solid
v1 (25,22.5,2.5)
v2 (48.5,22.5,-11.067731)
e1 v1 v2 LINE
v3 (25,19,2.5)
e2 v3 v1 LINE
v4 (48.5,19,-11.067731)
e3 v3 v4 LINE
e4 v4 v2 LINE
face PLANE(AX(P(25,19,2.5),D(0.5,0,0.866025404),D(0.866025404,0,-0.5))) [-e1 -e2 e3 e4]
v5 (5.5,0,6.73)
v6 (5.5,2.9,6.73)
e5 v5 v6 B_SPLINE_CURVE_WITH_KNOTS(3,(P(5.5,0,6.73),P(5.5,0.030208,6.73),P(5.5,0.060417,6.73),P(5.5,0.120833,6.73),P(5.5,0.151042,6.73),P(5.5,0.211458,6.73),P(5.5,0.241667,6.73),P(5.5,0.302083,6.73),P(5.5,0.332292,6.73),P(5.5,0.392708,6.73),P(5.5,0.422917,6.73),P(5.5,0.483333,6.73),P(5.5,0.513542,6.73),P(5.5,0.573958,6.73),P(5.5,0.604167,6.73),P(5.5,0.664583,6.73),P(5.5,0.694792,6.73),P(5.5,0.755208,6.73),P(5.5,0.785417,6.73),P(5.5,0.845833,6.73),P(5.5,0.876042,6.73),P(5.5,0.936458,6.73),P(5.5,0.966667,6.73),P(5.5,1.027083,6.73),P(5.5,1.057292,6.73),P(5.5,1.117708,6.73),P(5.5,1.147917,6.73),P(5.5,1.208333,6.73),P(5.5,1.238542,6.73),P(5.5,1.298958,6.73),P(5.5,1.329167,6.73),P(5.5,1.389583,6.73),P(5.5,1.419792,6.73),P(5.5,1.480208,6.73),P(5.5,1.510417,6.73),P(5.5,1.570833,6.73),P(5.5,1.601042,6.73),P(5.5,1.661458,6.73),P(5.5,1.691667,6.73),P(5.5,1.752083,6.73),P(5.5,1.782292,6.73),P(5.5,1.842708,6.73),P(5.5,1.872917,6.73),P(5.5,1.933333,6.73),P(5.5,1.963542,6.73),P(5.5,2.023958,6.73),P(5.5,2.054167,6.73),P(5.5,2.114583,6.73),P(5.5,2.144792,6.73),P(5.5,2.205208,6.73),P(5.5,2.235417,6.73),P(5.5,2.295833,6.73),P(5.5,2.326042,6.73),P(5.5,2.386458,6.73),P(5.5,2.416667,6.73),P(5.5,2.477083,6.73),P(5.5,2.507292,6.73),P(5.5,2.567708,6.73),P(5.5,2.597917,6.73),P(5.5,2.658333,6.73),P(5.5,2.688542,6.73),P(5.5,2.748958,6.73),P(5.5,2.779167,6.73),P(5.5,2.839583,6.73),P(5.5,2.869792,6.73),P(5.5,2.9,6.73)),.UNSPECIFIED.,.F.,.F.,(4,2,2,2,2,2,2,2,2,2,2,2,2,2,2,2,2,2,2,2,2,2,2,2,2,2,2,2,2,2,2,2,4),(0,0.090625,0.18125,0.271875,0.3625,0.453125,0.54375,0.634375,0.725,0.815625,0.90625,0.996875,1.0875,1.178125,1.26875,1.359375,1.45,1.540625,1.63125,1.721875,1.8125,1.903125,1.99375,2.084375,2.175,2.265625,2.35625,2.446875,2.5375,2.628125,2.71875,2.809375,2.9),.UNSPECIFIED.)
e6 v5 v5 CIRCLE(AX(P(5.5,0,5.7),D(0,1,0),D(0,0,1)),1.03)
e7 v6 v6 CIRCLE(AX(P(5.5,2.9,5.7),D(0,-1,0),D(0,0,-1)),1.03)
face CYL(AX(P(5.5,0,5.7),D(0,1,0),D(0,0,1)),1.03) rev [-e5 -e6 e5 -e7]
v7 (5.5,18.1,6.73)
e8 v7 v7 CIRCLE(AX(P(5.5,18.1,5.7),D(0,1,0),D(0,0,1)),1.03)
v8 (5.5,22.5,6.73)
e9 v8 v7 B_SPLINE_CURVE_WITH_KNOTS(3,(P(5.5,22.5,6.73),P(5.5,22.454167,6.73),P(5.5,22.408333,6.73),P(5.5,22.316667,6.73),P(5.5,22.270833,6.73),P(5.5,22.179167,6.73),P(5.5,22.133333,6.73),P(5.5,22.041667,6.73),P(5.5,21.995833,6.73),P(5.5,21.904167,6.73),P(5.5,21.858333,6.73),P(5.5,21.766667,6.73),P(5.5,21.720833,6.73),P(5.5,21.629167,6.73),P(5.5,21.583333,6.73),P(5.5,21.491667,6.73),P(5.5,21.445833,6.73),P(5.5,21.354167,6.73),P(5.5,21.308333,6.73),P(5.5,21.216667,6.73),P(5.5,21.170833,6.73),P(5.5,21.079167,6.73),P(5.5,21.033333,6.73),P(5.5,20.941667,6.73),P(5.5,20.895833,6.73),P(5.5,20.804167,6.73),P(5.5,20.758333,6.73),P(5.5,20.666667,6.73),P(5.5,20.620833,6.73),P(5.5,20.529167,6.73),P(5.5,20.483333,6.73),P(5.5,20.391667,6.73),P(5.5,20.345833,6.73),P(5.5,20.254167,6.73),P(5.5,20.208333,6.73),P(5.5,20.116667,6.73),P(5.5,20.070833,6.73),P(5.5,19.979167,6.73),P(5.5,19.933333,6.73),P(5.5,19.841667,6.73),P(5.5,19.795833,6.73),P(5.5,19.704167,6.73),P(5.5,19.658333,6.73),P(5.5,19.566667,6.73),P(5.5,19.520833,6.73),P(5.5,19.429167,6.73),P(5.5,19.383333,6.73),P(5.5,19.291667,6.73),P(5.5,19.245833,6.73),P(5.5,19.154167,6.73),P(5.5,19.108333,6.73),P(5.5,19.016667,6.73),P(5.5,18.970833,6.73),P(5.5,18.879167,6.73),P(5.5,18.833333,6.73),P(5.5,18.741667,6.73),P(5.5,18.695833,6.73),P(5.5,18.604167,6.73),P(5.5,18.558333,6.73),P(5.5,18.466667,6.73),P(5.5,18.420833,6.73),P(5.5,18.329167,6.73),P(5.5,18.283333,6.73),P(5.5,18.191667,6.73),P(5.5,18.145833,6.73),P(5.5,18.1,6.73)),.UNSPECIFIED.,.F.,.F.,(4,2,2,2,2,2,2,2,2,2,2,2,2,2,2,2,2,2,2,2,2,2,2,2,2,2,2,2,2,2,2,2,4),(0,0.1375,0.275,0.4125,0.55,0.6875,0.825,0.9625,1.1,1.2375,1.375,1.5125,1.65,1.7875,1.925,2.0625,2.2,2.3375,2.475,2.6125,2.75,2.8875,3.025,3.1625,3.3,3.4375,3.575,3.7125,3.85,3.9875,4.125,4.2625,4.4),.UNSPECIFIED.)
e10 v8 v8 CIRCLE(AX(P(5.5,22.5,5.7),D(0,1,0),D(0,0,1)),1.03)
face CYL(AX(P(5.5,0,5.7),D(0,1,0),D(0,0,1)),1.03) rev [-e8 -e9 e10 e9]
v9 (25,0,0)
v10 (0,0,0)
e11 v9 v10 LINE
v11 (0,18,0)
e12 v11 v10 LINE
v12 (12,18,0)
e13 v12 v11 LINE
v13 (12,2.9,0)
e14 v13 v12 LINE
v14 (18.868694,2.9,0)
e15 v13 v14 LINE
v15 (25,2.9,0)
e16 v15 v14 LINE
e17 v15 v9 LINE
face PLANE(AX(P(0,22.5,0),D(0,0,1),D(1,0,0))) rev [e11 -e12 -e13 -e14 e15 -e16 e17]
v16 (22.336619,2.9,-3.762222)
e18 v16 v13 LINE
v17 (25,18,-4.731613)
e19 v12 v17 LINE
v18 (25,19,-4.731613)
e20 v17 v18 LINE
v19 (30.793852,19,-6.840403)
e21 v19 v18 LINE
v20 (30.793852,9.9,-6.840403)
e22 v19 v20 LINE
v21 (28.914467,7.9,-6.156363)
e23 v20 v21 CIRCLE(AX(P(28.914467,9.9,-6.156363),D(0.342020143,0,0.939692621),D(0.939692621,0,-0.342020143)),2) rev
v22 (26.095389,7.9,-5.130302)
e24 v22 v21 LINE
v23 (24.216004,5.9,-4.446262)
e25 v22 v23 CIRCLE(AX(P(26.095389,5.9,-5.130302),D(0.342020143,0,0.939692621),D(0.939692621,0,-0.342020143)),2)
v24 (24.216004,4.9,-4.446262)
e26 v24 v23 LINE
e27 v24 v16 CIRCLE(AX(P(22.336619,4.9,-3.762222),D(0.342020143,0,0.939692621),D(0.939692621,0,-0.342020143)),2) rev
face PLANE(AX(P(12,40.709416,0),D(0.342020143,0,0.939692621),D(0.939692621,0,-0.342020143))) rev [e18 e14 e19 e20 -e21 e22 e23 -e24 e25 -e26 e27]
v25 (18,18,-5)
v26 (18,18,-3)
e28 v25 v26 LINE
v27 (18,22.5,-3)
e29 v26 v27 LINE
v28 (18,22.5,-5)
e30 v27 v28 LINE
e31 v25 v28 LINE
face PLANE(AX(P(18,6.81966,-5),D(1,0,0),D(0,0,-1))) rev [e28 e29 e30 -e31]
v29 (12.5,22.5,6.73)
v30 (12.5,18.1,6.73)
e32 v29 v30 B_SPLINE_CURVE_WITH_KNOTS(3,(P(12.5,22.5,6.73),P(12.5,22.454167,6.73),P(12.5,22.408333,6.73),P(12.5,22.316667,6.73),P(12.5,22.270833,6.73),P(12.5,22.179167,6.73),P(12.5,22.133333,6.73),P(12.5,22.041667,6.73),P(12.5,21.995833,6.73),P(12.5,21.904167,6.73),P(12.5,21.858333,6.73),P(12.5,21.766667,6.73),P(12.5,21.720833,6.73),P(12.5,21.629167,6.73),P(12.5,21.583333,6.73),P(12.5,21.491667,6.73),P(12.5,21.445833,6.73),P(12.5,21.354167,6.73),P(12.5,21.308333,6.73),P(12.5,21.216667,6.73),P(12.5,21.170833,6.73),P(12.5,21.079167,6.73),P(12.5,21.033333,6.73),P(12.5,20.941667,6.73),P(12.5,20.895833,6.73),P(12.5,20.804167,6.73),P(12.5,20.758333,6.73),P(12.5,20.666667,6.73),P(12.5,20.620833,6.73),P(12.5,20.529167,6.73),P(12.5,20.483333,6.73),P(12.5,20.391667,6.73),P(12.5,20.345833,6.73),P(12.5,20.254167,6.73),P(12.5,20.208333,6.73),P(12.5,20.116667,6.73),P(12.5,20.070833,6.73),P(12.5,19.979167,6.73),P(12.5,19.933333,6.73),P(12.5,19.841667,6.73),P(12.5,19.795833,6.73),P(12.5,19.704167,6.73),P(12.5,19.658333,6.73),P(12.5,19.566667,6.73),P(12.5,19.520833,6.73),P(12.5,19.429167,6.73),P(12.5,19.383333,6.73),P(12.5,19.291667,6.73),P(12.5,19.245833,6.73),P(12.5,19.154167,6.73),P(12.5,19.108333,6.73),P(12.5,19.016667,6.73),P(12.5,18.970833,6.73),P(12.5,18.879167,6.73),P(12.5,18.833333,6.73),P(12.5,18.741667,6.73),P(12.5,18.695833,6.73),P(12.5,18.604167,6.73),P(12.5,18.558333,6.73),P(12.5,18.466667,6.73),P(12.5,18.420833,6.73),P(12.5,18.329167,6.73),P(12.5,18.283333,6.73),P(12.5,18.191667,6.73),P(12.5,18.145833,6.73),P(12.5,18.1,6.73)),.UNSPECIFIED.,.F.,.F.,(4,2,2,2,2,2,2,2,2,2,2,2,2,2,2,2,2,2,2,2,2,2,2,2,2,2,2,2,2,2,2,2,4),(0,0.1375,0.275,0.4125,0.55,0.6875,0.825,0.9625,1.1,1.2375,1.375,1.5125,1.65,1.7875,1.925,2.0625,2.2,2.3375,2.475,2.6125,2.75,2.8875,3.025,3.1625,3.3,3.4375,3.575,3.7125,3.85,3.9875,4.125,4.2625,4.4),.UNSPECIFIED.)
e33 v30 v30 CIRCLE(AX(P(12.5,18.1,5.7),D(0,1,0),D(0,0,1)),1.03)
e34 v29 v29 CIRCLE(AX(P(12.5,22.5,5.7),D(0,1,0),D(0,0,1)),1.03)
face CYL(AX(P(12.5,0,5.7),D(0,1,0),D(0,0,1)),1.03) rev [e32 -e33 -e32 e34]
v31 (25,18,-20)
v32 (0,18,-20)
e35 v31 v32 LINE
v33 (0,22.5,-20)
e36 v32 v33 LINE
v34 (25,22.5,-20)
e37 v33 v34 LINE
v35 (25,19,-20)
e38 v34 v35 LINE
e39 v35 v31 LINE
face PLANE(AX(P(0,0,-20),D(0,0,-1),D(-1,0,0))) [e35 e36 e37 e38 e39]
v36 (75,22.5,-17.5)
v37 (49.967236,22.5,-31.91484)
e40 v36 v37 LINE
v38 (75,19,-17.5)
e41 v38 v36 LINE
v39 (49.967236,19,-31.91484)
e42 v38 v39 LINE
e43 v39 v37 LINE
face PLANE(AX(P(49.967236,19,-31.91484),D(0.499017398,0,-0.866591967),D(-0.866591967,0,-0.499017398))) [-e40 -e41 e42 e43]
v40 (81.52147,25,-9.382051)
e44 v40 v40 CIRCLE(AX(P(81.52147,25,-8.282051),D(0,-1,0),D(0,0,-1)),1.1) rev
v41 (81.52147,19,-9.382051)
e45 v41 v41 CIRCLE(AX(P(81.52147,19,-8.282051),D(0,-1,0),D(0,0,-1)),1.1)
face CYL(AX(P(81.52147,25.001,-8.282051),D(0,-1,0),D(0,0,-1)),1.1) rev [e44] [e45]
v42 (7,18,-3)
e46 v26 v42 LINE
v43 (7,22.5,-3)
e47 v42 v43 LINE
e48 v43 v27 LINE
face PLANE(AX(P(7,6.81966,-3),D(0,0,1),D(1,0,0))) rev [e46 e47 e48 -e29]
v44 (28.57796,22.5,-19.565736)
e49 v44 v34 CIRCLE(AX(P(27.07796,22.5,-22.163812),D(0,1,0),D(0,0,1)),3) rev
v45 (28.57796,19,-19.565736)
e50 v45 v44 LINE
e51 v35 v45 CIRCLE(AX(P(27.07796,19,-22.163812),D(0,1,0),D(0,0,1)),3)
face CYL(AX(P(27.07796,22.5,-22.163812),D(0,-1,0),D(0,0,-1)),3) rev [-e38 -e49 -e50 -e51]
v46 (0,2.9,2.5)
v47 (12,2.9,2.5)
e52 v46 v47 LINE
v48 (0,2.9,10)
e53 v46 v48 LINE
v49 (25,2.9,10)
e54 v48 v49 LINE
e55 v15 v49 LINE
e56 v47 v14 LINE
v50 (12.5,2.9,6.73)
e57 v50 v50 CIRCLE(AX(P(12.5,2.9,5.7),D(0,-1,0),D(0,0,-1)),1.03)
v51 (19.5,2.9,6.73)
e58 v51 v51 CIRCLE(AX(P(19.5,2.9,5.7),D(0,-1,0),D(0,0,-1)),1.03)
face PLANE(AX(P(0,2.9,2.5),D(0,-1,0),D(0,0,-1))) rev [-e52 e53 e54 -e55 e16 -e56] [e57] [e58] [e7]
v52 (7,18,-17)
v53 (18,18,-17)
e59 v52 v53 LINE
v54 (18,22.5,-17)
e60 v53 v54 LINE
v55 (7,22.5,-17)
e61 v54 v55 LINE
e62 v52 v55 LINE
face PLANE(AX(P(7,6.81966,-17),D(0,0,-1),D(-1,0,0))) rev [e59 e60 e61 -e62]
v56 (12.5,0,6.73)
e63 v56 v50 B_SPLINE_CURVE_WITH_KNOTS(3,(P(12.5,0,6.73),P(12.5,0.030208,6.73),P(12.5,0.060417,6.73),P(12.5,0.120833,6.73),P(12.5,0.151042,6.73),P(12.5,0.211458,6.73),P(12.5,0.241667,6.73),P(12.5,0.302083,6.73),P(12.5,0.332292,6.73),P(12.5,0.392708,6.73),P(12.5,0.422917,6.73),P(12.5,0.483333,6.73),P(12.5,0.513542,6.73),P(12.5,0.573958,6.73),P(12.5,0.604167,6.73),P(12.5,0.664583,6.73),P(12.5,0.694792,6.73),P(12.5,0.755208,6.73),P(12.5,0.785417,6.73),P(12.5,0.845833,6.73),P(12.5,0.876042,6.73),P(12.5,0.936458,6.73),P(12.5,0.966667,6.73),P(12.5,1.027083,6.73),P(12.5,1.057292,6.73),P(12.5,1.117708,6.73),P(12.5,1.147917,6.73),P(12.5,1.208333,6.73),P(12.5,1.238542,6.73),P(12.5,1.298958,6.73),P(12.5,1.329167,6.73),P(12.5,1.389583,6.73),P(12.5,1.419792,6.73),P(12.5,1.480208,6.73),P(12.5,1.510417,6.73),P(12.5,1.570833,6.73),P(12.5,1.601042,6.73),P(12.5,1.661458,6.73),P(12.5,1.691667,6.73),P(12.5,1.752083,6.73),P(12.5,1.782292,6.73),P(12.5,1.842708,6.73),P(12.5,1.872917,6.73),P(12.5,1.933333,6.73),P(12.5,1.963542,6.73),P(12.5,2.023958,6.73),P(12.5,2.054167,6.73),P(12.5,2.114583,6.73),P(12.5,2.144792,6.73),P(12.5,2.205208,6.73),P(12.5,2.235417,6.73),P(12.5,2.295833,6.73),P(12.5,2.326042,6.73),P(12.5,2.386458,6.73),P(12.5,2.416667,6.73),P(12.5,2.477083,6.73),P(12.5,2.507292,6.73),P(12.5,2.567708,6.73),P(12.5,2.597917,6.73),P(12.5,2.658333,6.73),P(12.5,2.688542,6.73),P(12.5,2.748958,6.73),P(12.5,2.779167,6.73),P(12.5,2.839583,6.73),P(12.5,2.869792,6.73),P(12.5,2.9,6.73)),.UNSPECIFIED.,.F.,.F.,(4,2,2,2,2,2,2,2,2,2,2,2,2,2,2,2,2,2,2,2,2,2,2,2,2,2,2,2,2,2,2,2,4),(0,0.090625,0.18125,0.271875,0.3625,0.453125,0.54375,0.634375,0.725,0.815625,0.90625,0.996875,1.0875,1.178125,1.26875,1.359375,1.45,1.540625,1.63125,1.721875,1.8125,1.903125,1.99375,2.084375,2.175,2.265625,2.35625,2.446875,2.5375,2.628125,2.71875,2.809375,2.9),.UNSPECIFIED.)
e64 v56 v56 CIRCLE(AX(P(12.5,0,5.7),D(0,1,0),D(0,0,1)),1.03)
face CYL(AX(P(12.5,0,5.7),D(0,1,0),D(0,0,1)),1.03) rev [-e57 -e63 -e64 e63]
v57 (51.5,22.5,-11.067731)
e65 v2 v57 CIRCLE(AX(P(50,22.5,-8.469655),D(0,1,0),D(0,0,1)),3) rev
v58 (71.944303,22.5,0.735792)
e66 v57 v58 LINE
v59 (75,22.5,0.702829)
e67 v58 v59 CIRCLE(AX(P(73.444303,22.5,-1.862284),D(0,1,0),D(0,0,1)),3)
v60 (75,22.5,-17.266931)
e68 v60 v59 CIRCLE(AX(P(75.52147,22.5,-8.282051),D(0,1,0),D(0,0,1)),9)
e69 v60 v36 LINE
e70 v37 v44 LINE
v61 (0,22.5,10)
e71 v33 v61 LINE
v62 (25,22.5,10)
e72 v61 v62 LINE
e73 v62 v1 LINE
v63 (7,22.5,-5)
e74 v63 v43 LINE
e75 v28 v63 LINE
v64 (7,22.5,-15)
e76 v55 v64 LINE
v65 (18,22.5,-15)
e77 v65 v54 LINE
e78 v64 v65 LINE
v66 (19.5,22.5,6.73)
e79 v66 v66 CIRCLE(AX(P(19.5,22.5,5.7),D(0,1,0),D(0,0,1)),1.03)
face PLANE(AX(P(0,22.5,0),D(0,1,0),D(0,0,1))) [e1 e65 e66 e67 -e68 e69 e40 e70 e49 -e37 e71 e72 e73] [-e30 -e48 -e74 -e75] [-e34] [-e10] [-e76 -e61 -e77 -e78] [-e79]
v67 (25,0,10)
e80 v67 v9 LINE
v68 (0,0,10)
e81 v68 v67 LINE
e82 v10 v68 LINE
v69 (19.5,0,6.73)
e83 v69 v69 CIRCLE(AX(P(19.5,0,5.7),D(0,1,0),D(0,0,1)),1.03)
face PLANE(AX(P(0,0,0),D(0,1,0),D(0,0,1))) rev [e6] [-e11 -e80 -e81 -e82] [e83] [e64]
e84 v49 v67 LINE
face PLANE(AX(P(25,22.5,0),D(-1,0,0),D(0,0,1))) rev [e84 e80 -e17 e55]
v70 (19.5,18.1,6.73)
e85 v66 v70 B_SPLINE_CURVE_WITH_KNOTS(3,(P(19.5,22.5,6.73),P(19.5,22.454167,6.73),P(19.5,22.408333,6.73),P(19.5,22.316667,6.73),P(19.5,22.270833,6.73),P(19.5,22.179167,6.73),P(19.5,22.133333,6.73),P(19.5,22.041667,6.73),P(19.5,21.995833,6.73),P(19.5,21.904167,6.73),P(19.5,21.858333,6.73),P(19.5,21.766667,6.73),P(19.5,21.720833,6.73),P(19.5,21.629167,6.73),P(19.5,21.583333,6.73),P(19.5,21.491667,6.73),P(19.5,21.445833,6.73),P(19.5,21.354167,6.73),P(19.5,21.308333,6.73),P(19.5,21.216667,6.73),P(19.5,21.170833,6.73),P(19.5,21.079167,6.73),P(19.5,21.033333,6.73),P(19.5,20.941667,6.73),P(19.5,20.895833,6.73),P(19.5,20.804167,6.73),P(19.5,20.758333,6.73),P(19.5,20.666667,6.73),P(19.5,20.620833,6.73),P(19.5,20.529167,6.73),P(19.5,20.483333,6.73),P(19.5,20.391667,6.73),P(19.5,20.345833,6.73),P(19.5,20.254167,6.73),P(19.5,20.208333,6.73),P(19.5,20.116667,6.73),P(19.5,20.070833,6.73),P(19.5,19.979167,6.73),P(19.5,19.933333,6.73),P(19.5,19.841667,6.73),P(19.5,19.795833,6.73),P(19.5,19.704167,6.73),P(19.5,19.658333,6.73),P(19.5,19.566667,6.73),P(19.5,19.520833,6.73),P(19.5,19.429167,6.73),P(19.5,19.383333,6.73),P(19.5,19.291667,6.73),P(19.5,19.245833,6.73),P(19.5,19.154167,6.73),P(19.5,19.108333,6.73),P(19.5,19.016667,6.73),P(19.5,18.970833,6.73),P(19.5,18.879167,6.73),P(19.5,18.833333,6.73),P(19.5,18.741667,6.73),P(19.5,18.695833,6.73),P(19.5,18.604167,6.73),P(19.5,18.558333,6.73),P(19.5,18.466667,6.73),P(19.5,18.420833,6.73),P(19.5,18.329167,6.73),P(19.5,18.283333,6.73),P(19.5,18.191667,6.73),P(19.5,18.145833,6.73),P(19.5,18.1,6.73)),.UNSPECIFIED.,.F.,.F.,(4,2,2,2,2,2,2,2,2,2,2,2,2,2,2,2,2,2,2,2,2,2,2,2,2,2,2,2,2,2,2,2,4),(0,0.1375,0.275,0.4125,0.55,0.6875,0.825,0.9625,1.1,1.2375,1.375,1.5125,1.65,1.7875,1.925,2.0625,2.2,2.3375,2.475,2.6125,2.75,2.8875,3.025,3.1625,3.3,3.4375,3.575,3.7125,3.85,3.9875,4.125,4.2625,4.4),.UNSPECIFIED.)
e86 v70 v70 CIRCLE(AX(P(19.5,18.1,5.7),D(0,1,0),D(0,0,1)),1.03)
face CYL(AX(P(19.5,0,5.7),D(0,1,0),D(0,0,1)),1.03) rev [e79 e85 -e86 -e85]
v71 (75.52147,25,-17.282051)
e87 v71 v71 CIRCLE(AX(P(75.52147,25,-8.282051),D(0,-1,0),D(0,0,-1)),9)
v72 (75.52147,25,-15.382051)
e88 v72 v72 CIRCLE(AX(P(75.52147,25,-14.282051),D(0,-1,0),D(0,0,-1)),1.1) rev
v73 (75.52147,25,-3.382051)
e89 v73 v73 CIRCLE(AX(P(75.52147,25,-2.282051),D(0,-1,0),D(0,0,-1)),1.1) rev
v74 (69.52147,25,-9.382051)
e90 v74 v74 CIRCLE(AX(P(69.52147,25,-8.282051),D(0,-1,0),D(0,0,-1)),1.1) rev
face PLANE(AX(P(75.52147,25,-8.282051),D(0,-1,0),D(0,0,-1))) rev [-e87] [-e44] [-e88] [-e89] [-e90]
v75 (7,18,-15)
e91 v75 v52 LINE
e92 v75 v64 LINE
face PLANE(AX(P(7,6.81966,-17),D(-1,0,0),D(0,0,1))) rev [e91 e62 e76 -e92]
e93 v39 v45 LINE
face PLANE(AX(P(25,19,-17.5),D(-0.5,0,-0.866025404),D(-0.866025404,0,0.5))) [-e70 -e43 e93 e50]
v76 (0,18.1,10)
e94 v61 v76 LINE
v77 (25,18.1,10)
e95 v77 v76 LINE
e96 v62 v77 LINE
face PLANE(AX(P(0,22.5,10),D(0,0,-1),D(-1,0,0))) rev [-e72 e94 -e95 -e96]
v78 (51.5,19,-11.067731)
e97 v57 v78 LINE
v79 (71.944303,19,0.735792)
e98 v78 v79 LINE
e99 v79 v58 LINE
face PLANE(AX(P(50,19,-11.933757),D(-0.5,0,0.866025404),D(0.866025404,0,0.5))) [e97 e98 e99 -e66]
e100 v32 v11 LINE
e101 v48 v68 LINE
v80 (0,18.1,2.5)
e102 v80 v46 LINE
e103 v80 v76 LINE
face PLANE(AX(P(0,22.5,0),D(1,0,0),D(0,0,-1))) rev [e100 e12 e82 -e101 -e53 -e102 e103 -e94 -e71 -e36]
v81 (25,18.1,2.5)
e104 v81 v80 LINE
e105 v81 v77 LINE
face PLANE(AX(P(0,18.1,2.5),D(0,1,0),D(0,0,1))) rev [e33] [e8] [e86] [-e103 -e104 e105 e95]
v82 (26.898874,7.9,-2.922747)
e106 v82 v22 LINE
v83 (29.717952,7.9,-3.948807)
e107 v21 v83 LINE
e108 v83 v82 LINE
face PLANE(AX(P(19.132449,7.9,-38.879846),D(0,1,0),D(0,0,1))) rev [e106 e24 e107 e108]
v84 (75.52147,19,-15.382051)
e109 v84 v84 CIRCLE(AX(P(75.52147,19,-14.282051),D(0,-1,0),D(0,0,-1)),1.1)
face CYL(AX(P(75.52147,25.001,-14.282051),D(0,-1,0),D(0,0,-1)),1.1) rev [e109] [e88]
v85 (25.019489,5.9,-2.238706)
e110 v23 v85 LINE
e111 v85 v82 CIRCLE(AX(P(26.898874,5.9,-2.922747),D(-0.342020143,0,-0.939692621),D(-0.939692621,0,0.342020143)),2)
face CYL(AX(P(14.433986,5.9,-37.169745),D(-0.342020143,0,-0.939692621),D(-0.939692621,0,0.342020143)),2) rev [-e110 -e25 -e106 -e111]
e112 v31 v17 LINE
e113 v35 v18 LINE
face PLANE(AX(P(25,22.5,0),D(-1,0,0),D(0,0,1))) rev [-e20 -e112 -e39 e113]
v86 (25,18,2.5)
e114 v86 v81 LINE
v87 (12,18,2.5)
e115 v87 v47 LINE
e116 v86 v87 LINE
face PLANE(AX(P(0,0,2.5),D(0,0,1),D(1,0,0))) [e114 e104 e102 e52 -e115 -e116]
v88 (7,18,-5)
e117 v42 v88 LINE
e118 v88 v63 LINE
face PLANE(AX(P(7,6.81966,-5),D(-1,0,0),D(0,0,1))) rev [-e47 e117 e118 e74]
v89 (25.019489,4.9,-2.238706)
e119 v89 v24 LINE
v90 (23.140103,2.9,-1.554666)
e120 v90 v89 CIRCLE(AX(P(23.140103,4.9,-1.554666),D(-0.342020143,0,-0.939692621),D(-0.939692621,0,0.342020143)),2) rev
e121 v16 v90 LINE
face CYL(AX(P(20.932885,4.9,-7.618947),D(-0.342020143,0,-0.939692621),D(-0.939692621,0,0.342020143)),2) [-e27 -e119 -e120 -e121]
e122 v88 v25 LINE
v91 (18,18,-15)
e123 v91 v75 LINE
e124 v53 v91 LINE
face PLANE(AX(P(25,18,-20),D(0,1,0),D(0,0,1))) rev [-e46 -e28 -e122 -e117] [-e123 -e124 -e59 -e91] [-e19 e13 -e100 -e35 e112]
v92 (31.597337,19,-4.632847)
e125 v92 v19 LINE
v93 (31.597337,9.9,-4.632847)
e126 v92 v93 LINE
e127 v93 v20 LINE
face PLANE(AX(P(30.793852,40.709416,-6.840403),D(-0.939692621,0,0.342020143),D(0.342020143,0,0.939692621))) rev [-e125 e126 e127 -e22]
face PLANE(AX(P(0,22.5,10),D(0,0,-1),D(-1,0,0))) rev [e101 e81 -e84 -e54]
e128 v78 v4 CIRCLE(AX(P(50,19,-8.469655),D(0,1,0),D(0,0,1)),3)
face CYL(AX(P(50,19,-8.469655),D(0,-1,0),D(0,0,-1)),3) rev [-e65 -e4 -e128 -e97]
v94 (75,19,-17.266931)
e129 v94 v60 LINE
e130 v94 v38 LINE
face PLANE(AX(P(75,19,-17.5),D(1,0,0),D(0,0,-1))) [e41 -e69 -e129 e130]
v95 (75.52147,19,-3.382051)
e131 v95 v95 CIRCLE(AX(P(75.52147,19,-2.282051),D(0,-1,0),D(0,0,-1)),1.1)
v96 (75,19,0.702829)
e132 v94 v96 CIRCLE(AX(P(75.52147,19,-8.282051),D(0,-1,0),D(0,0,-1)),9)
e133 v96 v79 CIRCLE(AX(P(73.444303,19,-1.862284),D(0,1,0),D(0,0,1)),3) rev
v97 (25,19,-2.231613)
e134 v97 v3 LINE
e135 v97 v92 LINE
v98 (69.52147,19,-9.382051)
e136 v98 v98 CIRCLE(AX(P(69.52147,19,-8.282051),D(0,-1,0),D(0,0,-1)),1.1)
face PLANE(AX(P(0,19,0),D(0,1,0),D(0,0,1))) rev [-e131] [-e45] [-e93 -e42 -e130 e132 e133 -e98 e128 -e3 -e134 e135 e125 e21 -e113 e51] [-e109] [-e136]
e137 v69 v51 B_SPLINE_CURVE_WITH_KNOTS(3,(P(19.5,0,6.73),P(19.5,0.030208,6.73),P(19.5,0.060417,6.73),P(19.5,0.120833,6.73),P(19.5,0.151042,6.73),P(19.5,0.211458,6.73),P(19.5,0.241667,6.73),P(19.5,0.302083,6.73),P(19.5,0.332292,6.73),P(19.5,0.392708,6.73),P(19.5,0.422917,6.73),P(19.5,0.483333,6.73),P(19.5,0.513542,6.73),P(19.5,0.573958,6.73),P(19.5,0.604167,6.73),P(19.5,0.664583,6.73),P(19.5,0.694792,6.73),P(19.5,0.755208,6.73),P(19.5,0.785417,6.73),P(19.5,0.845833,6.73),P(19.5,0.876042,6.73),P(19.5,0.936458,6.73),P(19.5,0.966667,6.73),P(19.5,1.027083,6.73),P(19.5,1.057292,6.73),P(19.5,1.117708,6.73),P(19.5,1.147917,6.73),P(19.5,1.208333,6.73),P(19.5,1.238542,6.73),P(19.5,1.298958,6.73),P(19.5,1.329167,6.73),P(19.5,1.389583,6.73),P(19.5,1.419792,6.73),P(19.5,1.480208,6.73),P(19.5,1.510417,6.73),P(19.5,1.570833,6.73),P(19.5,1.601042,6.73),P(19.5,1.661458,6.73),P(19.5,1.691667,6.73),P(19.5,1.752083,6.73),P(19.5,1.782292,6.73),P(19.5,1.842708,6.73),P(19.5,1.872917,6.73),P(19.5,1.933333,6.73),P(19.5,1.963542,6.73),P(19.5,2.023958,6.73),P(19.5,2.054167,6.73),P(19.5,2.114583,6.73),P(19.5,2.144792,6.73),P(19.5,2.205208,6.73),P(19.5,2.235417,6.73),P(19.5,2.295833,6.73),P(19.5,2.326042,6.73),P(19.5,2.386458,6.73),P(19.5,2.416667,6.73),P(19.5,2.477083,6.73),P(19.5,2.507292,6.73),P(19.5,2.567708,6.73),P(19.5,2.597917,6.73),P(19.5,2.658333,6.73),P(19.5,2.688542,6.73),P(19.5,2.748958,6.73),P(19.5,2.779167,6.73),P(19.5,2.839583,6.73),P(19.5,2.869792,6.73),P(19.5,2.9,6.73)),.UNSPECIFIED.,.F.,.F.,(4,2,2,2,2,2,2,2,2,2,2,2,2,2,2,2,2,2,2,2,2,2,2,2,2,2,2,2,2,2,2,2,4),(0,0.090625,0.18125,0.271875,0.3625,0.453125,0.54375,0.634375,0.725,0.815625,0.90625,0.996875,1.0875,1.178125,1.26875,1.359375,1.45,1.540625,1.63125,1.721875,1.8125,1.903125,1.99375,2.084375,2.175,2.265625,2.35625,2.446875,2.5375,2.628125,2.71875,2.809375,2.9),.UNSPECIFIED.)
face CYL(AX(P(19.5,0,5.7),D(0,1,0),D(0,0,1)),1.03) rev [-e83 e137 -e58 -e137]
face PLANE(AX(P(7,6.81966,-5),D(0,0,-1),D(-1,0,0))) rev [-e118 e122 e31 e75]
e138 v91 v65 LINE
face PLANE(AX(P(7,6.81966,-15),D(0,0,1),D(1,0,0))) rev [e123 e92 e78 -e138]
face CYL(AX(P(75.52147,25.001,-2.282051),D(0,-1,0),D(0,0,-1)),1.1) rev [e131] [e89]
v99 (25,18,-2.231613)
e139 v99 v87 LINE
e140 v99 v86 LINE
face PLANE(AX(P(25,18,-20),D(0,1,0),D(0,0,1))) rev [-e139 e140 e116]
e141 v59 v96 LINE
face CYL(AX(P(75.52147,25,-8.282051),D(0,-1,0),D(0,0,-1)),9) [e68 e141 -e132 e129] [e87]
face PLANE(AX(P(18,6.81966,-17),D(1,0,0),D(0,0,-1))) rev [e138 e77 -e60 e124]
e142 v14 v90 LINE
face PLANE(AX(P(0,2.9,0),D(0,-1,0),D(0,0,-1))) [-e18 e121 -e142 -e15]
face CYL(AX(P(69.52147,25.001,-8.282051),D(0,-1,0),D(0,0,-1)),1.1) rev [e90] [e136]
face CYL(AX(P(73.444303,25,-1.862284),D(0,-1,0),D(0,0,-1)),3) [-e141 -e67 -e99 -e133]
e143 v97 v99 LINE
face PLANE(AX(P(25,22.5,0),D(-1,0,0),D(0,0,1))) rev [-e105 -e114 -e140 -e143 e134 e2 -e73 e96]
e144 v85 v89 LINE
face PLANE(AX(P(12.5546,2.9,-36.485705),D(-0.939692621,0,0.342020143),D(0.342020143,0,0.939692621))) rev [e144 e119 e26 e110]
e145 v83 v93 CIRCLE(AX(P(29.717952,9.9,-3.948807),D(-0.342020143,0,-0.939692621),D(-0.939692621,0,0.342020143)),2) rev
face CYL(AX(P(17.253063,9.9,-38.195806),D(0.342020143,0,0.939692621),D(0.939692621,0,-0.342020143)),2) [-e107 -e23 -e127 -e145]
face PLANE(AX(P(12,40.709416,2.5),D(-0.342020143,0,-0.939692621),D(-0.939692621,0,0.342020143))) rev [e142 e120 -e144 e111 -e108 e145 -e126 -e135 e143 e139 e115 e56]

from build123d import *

# Parameters (mm, degrees)
SKETCH_1_W               = 25
SKETCH_1_H               = 10
EXTRUDE_1_DEPTH          = 22.5
SKETCH_2_W               = 25
SKETCH_2_H               = 15.2
CUT_EXTRUDE_1_DEPTH      = 7.5
CUT_EXTRUDE_2_DEPTH      = 36.089172119
CUT_EXTRUDE_2_DEPTH_BACK = 36.089172119
SKETCH_4_R               = 1.03
SKETCH_5_W               = 25
SKETCH_5_H               = 4.5
EXTRUDE_2_DEPTH          = 20
SKETCH_6_W               = 11
SKETCH_6_H               = 2
CUT_EXTRUDE_3_DEPTH      = 4.5
EXTRUDE_3_DEPTH          = 3.5
SKETCH_16_R              = 9
EXTRUDE_4_DEPTH          = 6
FILLET_1_R               = 3
CUT_EXTRUDE_4_REACH      = 94.322
SKETCH_17_R              = 1.1
SKETCH_19_W              = 13
SKETCH_19_H              = 15.1
CUT_EXTRUDE_5_DEPTH      = 10
EXTRUDE_5_REACH          = 95.01
CUT_EXTRUDE_6_REACH      = 96.037
SKETCH_22_W              = 7
SKETCH_22_H              = 5
FILLET_3_R               = 2


with BuildPart() as part:
    # 草图1 → 凸台-拉伸1 (new body)
    with BuildSketch(Plane(origin=(0, 0, 0), x_dir=(1, 0, 0), z_dir=(0, 1, 0))):
        with Locations((12.5, -5)):
            Rectangle(SKETCH_1_W, SKETCH_1_H)
    extrude(amount=EXTRUDE_1_DEPTH)

    # 草图2 → 切除-拉伸1 (cut)
    with BuildSketch(Plane.XY.offset(10)):
        with Locations((12.5, 10.5)):
            Rectangle(SKETCH_2_W, SKETCH_2_H)
    extrude(amount=-CUT_EXTRUDE_1_DEPTH, mode=Mode.SUBTRACT)

    # 草图4 → 切除-拉伸2 (cut, two sides: drawn at the far end of the back side and taken through both)
    with BuildSketch(Plane(origin=(0, 22.5, 0), x_dir=(1, 0, 0), z_dir=(0, 1, 0)).offset(-CUT_EXTRUDE_2_DEPTH_BACK)):
        with Locations(Location((12.5, -5.7, 0), (0, 0, 270))):
            Circle(SKETCH_4_R)
        with Locations(Location((19.5, -5.7, 0), (0, 0, 270))):
            Circle(SKETCH_4_R)
        with Locations(Location((5.5, -5.7, 0), (0, 0, 270))):
            Circle(SKETCH_4_R)
    extrude(amount=CUT_EXTRUDE_2_DEPTH + CUT_EXTRUDE_2_DEPTH_BACK, mode=Mode.SUBTRACT)

    # 草图5 → 凸台-拉伸2 (add)
    with BuildSketch(Plane(origin=(0, 0, 0), x_dir=(-1, 0, 0), z_dir=(0, 0, -1))):
        with Locations((-12.5, 20.25)):
            Rectangle(SKETCH_5_W, SKETCH_5_H)
    extrude(amount=EXTRUDE_2_DEPTH)

    # 草图6 → 切除-拉伸3 (cut)
    with BuildSketch(Plane(origin=(0, 22.5, 0), x_dir=(1, 0, 0), z_dir=(0, 1, 0))):
        with Locations((12.5, 16)):
            Rectangle(SKETCH_6_W, SKETCH_6_H)
        with Locations((12.5, 4)):
            Rectangle(SKETCH_6_W, SKETCH_6_H)
    extrude(amount=-CUT_EXTRUDE_3_DEPTH, mode=Mode.SUBTRACT)

    # 草图15 → 凸台-拉伸3 (add)
    with BuildSketch(Plane(origin=(0, 22.5, 0), x_dir=(1, 0, 0), z_dir=(0, 1, 0))):
        Polygon((25, -2.5), (50, 11.93375673), (75, -2.5), (75, 17.5), (49.967235844, 31.914840335), (25, 17.5), align=None)
    extrude(amount=-EXTRUDE_3_DEPTH)

    # 草图16 → 凸台-拉伸4 (add)
    with BuildSketch(Plane.XZ.offset(-19)):
        with Locations(Location((75.52146997, -8.282050808, 0), (0, 0, 270))):
            Circle(SKETCH_16_R)
    extrude(amount=-EXTRUDE_4_DEPTH)

    # 圆角1
    # the kernel refuses this fillet: 3 mm, written as the material it adds along each edge
    with BuildSketch(Plane(origin=(50, 22.5, -11.93375673), x_dir=(-0.8660254037844394, 0, 0.4999999999999987), z_dir=(0, -1, 0))) as fillet_1_piece_1:
        with BuildLine():
            CenterArc((FILLET_1_R * 0.57735026919, -FILLET_1_R), FILLET_1_R, 90, 60)
            Line((-FILLET_1_R * 0.288675134595, -FILLET_1_R * 0.5), (-FILLET_1_R * 0.305995642671, -FILLET_1_R * 0.49))
            Line((-FILLET_1_R * 0.305995642671, -FILLET_1_R * 0.49), (-FILLET_1_R * 0.0115470053838, FILLET_1_R * 0.02))
            Line((-FILLET_1_R * 0.0115470053838, FILLET_1_R * 0.02), (FILLET_1_R * 0.57735026919, FILLET_1_R * 0.02))
            Line((FILLET_1_R * 0.57735026919, FILLET_1_R * 0.02), (FILLET_1_R * 0.57735026919, 0))
        make_face()
    extrude(amount=3.5)
    with BuildSketch(Plane(origin=(25, 22.5, -17.5), x_dir=(0, 0, -1), z_dir=(0, -1, 0))) as fillet_1_piece_2:
        with BuildLine():
            CenterArc((4.663812226, 2.077959733), FILLET_1_R, 150, 73.840504848)
            Line((2.065736015, 3.577959733), (2.013774491, 3.607959733))
            Line((2.013774491, 3.607959733), (-0.051961524, 0.03))
            Line((-0.051961524, 0.03), (0, -0.06))
            ThreePointArc((0, -0.06), (1.25, -0.06), (2.456723755, -0.041559195))
            Line((2.456723755, -0.041559195), (2.5, 0))
        make_face()
    extrude(amount=3.5)
    # the kernel refuses this fillet: 3 mm, written as the material it takes off along each edge
    with BuildSketch(Plane(origin=(75, 31.321038653, 2.5), x_dir=(0, 0, -1), z_dir=(0, -1, 0))) as fillet_1_2_piece_1:
        with BuildLine():
            CenterArc((4.362283942, -1.555697425), FILLET_1_R, 148.763902171, 61.236097829)
            Line((1.764207731, -3.055697425), (1.712246206, -3.085697425))
            Line((1.712246206, -3.085697425), (-0.051961524, -0.03))
            Line((-0.051961524, -0.03), (0, 0.06))
            ThreePointArc((0, 0.06), (0.898585391, 0.06), (1.745868519, 0.031113948))
            Line((1.745868519, 0.031113948), (1.797170782, 0))
        make_face()
    extrude(amount=21.142077307, mode=Mode.SUBTRACT)

    # 草图17 → 切除-拉伸4 (cut, up to next)
    with BuildSketch(Plane.XZ.offset(-19), mode=Mode.PRIVATE) as cut_extrude_4_sk1:
        with Locations(Location((75.521469969, -14.282050811, 0), (0, 0, 270))):
            Circle(SKETCH_17_R)
    cut_extrude_4_tool1 = extrude(cut_extrude_4_sk1.sketch, amount=-CUT_EXTRUDE_4_REACH, mode=Mode.PRIVATE) & part.part
    # 草图17 → 切除-拉伸4 (cut, up to next)
    with BuildSketch(Plane.XZ.offset(-19), mode=Mode.PRIVATE) as cut_extrude_4_sk2:
        with Locations(Location((75.521469969, -2.282050808, 0), (0, 0, 270))):
            Circle(SKETCH_17_R)
    cut_extrude_4_tool2 = extrude(cut_extrude_4_sk2.sketch, amount=-CUT_EXTRUDE_4_REACH, mode=Mode.PRIVATE) & part.part
    # 草图17 → 切除-拉伸4 (cut, up to next)
    with BuildSketch(Plane.XZ.offset(-19), mode=Mode.PRIVATE) as cut_extrude_4_sk3:
        with Locations(Location((69.521469967, -8.282050809, 0), (0, 0, 270))):
            Circle(SKETCH_17_R)
    cut_extrude_4_tool3 = extrude(cut_extrude_4_sk3.sketch, amount=-CUT_EXTRUDE_4_REACH, mode=Mode.PRIVATE) & part.part
    # 草图17 → 切除-拉伸4 (cut, up to next)
    with BuildSketch(Plane.XZ.offset(-19), mode=Mode.PRIVATE) as cut_extrude_4_sk4:
        with Locations(Location((81.52146997, -8.282050809, 0), (0, 0, 270))):
            Circle(SKETCH_17_R)
    cut_extrude_4_tool4 = extrude(cut_extrude_4_sk4.sketch, amount=-CUT_EXTRUDE_4_REACH, mode=Mode.PRIVATE) & part.part
    add(cut_extrude_4_tool1.solids().sort_by_distance((75.52147, 19, -14.282051))[0], mode=Mode.SUBTRACT)
    add(cut_extrude_4_tool2.solids().sort_by_distance((75.52147, 19, -2.282051))[0], mode=Mode.SUBTRACT)
    add(cut_extrude_4_tool3.solids().sort_by_distance((69.52147, 19, -8.282051))[0], mode=Mode.SUBTRACT)
    add(cut_extrude_4_tool4.solids().sort_by_distance((81.52147, 19, -8.282051))[0], mode=Mode.SUBTRACT)

    # 草图19 → 切除-拉伸5 (cut)
    with BuildSketch(Plane(origin=(0, 0, 0), x_dir=(-1, 0, 0), z_dir=(0, 0, -1))):
        with Locations((-18.5, 10.45)):
            Rectangle(SKETCH_19_W, SKETCH_19_H)
    extrude(amount=-CUT_EXTRUDE_5_DEPTH, mode=Mode.SUBTRACT)

    # 凸台-拉伸5: up to this face of the body (flat: up to its plane)
    extrude_5_end = Plane(part.part.faces().sort_by_distance((53.082748758, 19, -14.052317246))[0])
    # 草图21 → 凸台-拉伸5 (add, up to the picked face)
    with BuildSketch(Plane(origin=(0, 2.9, 0), x_dir=(1, 0, 0), z_dir=(0, 1, 0)), mode=Mode.PRIVATE) as extrude_5_sk1:
        Polygon((12, -2.5), (12, 0), (30.793852416, 6.840402867), (31.597336928, 4.632847313), align=None)
    extrude_5_tool1 = split(extrude(extrude_5_sk1.sketch, amount=EXTRUDE_5_REACH, mode=Mode.PRIVATE), bisect_by=extrude_5_end, keep=Keep.BOTH, mode=Mode.PRIVATE)
    add(extrude_5_tool1.solids().sort_by(Axis((21.599199, 2.9, -2.235102), (0, 1, 0)))[0])

    # 草图22 → 切除-拉伸6 (cut, up to next)
    with BuildSketch(Plane(origin=(2.207217853, 0, 6.064281212), x_dir=(0.9396926207859104, 0, -0.3420201433256632), z_dir=(0.3420201433256632, 0, 0.9396926207859104)), mode=Mode.PRIVATE) as cut_extrude_6_sk1:
        with Locations((27.776311449, 5.4)):
            Rectangle(SKETCH_22_W, SKETCH_22_H)
    cut_extrude_6_tool1 = extrude(cut_extrude_6_sk1.sketch, amount=-CUT_EXTRUDE_6_REACH, mode=Mode.PRIVATE) & part.part
    add(cut_extrude_6_tool1.solids().sort_by_distance((28.308413, 5.4, -3.435777))[0], mode=Mode.SUBTRACT)

    # 圆角3
    fillet_3_edges = [part.edges().sort_by_distance(p)[0] for p in [
        (31.195594672, 7.9, -5.73662509),
        (24.617746326, 2.9, -3.342484086),
        (24.617746326, 7.9, -3.342484086),
    ]]
    fillet(fillet_3_edges, radius=FILLET_3_R)


solid = part.part
